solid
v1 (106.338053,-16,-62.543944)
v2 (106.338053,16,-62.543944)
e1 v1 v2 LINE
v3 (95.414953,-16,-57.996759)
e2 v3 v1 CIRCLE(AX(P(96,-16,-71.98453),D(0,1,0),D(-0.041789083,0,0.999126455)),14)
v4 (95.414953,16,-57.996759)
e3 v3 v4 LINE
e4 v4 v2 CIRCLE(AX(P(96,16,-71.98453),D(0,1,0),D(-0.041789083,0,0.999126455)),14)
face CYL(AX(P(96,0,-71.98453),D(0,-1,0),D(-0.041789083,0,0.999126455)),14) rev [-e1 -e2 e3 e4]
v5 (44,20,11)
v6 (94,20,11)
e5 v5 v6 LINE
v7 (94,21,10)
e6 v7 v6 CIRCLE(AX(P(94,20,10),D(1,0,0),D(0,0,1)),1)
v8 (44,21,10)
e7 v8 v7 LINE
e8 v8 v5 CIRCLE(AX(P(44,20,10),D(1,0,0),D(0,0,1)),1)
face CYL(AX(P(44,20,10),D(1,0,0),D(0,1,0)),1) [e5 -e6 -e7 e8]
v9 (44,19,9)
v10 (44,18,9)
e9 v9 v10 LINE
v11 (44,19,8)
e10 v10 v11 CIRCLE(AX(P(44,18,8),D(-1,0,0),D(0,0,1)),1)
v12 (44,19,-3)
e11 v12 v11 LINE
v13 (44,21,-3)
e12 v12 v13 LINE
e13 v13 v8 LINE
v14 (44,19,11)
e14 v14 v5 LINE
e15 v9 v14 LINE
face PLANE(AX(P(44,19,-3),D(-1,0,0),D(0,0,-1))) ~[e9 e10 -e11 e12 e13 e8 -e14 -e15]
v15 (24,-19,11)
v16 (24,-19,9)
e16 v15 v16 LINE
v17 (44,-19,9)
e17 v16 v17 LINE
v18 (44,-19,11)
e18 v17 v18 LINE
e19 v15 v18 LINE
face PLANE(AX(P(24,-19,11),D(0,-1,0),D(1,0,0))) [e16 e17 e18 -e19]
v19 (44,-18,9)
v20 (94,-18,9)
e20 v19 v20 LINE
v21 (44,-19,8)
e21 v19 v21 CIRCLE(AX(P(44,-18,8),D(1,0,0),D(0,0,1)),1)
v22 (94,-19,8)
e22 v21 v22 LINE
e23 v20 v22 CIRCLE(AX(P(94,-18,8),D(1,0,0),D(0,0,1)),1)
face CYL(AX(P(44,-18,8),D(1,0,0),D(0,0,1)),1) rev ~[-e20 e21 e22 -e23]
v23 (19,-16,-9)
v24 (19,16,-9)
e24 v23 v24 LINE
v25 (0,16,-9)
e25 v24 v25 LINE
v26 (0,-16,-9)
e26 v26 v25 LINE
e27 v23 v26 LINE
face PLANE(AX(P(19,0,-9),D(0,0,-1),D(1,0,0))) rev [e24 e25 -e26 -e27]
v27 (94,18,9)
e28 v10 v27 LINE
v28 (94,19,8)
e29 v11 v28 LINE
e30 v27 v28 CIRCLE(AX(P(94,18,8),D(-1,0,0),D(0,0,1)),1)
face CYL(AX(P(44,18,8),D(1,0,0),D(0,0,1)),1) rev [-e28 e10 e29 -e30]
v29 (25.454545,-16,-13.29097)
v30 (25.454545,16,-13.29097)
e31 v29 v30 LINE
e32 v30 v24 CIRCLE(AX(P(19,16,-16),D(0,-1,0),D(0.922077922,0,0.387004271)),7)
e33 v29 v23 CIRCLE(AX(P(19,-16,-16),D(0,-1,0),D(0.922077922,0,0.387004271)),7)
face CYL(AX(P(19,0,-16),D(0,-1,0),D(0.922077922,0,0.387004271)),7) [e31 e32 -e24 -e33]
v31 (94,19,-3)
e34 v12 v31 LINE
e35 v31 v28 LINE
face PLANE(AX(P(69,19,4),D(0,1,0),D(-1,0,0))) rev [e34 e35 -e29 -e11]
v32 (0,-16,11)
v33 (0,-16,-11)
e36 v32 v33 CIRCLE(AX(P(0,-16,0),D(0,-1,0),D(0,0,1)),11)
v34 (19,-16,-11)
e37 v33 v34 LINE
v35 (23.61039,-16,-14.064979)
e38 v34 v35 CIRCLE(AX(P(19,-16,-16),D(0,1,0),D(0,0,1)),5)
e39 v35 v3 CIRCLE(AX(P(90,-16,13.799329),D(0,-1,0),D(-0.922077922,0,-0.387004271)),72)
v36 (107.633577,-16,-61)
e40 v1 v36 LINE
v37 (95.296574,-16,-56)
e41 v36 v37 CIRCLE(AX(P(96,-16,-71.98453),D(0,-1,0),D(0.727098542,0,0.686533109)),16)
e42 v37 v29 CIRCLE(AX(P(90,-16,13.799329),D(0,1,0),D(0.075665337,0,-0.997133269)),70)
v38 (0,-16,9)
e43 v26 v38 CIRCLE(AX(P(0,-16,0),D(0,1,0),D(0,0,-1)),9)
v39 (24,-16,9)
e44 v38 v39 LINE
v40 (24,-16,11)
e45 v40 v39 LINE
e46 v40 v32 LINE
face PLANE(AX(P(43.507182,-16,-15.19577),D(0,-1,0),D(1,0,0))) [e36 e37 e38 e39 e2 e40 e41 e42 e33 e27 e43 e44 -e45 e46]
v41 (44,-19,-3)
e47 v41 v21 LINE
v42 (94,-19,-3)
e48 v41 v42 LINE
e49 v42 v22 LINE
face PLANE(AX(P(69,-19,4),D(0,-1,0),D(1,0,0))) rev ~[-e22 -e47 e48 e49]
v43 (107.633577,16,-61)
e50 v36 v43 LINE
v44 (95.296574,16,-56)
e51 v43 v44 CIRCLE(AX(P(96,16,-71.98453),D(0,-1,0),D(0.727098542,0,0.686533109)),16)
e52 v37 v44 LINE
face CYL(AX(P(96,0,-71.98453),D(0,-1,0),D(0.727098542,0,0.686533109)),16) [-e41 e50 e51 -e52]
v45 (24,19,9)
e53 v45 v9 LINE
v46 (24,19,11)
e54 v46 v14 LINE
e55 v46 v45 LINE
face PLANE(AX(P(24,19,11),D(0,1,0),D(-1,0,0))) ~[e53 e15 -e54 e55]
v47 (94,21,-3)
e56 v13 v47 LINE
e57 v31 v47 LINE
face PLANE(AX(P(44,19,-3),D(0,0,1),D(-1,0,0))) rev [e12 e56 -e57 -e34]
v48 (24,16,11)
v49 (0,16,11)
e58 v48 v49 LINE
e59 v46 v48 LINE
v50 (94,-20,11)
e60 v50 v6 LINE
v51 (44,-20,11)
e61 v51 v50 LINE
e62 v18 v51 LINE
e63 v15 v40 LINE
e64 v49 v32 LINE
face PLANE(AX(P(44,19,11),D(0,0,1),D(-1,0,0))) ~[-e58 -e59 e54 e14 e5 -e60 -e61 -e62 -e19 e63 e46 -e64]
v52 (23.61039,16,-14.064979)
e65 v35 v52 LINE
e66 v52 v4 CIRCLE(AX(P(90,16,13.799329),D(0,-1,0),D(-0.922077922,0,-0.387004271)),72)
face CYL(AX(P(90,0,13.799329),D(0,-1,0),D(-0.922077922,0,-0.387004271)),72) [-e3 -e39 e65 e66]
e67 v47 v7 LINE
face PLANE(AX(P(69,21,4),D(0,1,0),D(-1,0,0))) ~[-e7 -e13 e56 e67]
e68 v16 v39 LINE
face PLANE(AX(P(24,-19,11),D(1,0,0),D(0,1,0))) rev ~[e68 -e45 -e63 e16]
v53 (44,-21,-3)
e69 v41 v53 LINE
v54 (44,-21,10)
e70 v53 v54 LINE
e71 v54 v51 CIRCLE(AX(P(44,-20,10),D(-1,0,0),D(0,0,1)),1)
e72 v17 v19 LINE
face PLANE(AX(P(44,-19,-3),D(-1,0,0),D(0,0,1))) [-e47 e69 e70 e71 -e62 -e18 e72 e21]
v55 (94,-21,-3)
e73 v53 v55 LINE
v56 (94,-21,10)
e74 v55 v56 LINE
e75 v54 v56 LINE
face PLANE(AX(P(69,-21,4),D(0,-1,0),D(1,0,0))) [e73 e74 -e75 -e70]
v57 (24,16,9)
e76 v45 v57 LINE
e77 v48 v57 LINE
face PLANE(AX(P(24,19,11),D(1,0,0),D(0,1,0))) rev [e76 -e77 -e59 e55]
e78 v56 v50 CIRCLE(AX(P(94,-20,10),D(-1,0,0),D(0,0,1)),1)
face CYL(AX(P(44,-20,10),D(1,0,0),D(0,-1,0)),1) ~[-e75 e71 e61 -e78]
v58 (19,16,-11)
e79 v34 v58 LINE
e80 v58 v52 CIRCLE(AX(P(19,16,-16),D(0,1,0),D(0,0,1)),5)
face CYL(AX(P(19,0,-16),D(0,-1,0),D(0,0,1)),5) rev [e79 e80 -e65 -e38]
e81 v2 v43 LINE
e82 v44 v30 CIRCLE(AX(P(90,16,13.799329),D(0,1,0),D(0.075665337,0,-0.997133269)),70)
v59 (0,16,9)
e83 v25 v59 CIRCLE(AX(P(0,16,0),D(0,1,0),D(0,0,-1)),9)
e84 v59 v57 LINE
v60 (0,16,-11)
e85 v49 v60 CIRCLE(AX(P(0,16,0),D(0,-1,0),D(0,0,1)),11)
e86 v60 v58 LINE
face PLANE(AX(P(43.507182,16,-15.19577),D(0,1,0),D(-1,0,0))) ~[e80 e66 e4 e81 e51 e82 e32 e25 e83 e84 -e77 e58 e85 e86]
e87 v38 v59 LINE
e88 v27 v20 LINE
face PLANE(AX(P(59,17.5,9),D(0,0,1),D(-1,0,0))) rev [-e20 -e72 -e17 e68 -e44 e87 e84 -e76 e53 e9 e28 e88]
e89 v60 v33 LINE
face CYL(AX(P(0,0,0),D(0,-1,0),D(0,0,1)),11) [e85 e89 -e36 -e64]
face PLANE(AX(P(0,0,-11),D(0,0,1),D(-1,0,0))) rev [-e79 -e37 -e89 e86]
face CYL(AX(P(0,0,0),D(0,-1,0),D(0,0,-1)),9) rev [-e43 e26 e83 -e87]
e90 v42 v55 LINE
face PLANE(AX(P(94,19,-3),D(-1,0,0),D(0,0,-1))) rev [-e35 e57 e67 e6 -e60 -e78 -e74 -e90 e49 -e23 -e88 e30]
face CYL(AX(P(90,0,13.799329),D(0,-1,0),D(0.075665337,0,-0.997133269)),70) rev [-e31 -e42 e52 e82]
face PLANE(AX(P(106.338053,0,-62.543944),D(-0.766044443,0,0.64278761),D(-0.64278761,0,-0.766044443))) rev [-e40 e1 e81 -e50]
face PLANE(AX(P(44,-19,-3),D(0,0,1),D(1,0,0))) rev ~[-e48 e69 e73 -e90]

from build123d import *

# Parameters (mm, degrees)
F1_DEPTH = 16
F2_W     = 70
F2_H     = 3
F3_DEPTH = 2
F4_W     = 50
F4_H     = 14
F5_DEPTH = 2
F6_R     = 1


with BuildPart() as f1:
    # F0 (on Front) → F1 (new body)
    with BuildSketch(Plane.XZ):
        with BuildLine():
            Line((94, 11), (0, 11))
            ThreePointArc((0, 11), (-11, 0), (0, -11))
            Line((0, -11), (19, -11))
            ThreePointArc((19, -11), (21.7681124643, -11.8361612201), (23.6103896104, -14.064978646))
            ThreePointArc((23.6103896104, -14.064978646), (52.4237101957, -47.6174640031), (95.4149528414, -57.9967593826))
            ThreePointArc((95.4149528414, -57.9967593826), (101.3804745105, -59.0597282402), (106.3380534538, -62.5439444501))
            Line((106.3380534538, -62.5439444501), (107.6335766724, -61))
            ThreePointArc((107.6335766724, -61), (102.0097459375, -57.1560789275), (95.2965735981, -56))
            ThreePointArc((95.2965735981, -56), (53.4811996085, -45.9198240056), (25.4545454545, -13.2909701044))
            ThreePointArc((25.4545454545, -13.2909701044), (22.87535745, -10.1706257081), (19, -9))
            Line((19, -9), (0, -9))
            ThreePointArc((0, -9), (-9, 0), (0, 9))
            Line((0, 9), (94, 9))
            Line((94, 9), (94, 11))
        make_face()
    extrude(amount=F1_DEPTH)

    # F2 (on face) → F3 (join)
    with BuildSketch(Plane.XY.offset(11)):
        with Locations((59, -17.5)):
            Rectangle(F2_W, F2_H)
    extrude(amount=-F3_DEPTH)

    # F4 (on face) → F5 (join)
    with BuildSketch(Plane.XZ.offset(19)):
        with Locations((69, 4)):
            Rectangle(F4_W, F4_H)
    extrude(amount=F5_DEPTH)

    # F6
    f6_edges = [f1.edges().sort_by_distance(p)[0] for p in [
        (69, -21, 11),
        (69, -19, 9),
    ]]
    fillet(f6_edges, radius=F6_R)

    # F7: F1 across plane


with BuildPart() as f1_1:
    add(f1.part)
    add(f1.part.mirror(Plane.XZ))


solid = f1_1.part
